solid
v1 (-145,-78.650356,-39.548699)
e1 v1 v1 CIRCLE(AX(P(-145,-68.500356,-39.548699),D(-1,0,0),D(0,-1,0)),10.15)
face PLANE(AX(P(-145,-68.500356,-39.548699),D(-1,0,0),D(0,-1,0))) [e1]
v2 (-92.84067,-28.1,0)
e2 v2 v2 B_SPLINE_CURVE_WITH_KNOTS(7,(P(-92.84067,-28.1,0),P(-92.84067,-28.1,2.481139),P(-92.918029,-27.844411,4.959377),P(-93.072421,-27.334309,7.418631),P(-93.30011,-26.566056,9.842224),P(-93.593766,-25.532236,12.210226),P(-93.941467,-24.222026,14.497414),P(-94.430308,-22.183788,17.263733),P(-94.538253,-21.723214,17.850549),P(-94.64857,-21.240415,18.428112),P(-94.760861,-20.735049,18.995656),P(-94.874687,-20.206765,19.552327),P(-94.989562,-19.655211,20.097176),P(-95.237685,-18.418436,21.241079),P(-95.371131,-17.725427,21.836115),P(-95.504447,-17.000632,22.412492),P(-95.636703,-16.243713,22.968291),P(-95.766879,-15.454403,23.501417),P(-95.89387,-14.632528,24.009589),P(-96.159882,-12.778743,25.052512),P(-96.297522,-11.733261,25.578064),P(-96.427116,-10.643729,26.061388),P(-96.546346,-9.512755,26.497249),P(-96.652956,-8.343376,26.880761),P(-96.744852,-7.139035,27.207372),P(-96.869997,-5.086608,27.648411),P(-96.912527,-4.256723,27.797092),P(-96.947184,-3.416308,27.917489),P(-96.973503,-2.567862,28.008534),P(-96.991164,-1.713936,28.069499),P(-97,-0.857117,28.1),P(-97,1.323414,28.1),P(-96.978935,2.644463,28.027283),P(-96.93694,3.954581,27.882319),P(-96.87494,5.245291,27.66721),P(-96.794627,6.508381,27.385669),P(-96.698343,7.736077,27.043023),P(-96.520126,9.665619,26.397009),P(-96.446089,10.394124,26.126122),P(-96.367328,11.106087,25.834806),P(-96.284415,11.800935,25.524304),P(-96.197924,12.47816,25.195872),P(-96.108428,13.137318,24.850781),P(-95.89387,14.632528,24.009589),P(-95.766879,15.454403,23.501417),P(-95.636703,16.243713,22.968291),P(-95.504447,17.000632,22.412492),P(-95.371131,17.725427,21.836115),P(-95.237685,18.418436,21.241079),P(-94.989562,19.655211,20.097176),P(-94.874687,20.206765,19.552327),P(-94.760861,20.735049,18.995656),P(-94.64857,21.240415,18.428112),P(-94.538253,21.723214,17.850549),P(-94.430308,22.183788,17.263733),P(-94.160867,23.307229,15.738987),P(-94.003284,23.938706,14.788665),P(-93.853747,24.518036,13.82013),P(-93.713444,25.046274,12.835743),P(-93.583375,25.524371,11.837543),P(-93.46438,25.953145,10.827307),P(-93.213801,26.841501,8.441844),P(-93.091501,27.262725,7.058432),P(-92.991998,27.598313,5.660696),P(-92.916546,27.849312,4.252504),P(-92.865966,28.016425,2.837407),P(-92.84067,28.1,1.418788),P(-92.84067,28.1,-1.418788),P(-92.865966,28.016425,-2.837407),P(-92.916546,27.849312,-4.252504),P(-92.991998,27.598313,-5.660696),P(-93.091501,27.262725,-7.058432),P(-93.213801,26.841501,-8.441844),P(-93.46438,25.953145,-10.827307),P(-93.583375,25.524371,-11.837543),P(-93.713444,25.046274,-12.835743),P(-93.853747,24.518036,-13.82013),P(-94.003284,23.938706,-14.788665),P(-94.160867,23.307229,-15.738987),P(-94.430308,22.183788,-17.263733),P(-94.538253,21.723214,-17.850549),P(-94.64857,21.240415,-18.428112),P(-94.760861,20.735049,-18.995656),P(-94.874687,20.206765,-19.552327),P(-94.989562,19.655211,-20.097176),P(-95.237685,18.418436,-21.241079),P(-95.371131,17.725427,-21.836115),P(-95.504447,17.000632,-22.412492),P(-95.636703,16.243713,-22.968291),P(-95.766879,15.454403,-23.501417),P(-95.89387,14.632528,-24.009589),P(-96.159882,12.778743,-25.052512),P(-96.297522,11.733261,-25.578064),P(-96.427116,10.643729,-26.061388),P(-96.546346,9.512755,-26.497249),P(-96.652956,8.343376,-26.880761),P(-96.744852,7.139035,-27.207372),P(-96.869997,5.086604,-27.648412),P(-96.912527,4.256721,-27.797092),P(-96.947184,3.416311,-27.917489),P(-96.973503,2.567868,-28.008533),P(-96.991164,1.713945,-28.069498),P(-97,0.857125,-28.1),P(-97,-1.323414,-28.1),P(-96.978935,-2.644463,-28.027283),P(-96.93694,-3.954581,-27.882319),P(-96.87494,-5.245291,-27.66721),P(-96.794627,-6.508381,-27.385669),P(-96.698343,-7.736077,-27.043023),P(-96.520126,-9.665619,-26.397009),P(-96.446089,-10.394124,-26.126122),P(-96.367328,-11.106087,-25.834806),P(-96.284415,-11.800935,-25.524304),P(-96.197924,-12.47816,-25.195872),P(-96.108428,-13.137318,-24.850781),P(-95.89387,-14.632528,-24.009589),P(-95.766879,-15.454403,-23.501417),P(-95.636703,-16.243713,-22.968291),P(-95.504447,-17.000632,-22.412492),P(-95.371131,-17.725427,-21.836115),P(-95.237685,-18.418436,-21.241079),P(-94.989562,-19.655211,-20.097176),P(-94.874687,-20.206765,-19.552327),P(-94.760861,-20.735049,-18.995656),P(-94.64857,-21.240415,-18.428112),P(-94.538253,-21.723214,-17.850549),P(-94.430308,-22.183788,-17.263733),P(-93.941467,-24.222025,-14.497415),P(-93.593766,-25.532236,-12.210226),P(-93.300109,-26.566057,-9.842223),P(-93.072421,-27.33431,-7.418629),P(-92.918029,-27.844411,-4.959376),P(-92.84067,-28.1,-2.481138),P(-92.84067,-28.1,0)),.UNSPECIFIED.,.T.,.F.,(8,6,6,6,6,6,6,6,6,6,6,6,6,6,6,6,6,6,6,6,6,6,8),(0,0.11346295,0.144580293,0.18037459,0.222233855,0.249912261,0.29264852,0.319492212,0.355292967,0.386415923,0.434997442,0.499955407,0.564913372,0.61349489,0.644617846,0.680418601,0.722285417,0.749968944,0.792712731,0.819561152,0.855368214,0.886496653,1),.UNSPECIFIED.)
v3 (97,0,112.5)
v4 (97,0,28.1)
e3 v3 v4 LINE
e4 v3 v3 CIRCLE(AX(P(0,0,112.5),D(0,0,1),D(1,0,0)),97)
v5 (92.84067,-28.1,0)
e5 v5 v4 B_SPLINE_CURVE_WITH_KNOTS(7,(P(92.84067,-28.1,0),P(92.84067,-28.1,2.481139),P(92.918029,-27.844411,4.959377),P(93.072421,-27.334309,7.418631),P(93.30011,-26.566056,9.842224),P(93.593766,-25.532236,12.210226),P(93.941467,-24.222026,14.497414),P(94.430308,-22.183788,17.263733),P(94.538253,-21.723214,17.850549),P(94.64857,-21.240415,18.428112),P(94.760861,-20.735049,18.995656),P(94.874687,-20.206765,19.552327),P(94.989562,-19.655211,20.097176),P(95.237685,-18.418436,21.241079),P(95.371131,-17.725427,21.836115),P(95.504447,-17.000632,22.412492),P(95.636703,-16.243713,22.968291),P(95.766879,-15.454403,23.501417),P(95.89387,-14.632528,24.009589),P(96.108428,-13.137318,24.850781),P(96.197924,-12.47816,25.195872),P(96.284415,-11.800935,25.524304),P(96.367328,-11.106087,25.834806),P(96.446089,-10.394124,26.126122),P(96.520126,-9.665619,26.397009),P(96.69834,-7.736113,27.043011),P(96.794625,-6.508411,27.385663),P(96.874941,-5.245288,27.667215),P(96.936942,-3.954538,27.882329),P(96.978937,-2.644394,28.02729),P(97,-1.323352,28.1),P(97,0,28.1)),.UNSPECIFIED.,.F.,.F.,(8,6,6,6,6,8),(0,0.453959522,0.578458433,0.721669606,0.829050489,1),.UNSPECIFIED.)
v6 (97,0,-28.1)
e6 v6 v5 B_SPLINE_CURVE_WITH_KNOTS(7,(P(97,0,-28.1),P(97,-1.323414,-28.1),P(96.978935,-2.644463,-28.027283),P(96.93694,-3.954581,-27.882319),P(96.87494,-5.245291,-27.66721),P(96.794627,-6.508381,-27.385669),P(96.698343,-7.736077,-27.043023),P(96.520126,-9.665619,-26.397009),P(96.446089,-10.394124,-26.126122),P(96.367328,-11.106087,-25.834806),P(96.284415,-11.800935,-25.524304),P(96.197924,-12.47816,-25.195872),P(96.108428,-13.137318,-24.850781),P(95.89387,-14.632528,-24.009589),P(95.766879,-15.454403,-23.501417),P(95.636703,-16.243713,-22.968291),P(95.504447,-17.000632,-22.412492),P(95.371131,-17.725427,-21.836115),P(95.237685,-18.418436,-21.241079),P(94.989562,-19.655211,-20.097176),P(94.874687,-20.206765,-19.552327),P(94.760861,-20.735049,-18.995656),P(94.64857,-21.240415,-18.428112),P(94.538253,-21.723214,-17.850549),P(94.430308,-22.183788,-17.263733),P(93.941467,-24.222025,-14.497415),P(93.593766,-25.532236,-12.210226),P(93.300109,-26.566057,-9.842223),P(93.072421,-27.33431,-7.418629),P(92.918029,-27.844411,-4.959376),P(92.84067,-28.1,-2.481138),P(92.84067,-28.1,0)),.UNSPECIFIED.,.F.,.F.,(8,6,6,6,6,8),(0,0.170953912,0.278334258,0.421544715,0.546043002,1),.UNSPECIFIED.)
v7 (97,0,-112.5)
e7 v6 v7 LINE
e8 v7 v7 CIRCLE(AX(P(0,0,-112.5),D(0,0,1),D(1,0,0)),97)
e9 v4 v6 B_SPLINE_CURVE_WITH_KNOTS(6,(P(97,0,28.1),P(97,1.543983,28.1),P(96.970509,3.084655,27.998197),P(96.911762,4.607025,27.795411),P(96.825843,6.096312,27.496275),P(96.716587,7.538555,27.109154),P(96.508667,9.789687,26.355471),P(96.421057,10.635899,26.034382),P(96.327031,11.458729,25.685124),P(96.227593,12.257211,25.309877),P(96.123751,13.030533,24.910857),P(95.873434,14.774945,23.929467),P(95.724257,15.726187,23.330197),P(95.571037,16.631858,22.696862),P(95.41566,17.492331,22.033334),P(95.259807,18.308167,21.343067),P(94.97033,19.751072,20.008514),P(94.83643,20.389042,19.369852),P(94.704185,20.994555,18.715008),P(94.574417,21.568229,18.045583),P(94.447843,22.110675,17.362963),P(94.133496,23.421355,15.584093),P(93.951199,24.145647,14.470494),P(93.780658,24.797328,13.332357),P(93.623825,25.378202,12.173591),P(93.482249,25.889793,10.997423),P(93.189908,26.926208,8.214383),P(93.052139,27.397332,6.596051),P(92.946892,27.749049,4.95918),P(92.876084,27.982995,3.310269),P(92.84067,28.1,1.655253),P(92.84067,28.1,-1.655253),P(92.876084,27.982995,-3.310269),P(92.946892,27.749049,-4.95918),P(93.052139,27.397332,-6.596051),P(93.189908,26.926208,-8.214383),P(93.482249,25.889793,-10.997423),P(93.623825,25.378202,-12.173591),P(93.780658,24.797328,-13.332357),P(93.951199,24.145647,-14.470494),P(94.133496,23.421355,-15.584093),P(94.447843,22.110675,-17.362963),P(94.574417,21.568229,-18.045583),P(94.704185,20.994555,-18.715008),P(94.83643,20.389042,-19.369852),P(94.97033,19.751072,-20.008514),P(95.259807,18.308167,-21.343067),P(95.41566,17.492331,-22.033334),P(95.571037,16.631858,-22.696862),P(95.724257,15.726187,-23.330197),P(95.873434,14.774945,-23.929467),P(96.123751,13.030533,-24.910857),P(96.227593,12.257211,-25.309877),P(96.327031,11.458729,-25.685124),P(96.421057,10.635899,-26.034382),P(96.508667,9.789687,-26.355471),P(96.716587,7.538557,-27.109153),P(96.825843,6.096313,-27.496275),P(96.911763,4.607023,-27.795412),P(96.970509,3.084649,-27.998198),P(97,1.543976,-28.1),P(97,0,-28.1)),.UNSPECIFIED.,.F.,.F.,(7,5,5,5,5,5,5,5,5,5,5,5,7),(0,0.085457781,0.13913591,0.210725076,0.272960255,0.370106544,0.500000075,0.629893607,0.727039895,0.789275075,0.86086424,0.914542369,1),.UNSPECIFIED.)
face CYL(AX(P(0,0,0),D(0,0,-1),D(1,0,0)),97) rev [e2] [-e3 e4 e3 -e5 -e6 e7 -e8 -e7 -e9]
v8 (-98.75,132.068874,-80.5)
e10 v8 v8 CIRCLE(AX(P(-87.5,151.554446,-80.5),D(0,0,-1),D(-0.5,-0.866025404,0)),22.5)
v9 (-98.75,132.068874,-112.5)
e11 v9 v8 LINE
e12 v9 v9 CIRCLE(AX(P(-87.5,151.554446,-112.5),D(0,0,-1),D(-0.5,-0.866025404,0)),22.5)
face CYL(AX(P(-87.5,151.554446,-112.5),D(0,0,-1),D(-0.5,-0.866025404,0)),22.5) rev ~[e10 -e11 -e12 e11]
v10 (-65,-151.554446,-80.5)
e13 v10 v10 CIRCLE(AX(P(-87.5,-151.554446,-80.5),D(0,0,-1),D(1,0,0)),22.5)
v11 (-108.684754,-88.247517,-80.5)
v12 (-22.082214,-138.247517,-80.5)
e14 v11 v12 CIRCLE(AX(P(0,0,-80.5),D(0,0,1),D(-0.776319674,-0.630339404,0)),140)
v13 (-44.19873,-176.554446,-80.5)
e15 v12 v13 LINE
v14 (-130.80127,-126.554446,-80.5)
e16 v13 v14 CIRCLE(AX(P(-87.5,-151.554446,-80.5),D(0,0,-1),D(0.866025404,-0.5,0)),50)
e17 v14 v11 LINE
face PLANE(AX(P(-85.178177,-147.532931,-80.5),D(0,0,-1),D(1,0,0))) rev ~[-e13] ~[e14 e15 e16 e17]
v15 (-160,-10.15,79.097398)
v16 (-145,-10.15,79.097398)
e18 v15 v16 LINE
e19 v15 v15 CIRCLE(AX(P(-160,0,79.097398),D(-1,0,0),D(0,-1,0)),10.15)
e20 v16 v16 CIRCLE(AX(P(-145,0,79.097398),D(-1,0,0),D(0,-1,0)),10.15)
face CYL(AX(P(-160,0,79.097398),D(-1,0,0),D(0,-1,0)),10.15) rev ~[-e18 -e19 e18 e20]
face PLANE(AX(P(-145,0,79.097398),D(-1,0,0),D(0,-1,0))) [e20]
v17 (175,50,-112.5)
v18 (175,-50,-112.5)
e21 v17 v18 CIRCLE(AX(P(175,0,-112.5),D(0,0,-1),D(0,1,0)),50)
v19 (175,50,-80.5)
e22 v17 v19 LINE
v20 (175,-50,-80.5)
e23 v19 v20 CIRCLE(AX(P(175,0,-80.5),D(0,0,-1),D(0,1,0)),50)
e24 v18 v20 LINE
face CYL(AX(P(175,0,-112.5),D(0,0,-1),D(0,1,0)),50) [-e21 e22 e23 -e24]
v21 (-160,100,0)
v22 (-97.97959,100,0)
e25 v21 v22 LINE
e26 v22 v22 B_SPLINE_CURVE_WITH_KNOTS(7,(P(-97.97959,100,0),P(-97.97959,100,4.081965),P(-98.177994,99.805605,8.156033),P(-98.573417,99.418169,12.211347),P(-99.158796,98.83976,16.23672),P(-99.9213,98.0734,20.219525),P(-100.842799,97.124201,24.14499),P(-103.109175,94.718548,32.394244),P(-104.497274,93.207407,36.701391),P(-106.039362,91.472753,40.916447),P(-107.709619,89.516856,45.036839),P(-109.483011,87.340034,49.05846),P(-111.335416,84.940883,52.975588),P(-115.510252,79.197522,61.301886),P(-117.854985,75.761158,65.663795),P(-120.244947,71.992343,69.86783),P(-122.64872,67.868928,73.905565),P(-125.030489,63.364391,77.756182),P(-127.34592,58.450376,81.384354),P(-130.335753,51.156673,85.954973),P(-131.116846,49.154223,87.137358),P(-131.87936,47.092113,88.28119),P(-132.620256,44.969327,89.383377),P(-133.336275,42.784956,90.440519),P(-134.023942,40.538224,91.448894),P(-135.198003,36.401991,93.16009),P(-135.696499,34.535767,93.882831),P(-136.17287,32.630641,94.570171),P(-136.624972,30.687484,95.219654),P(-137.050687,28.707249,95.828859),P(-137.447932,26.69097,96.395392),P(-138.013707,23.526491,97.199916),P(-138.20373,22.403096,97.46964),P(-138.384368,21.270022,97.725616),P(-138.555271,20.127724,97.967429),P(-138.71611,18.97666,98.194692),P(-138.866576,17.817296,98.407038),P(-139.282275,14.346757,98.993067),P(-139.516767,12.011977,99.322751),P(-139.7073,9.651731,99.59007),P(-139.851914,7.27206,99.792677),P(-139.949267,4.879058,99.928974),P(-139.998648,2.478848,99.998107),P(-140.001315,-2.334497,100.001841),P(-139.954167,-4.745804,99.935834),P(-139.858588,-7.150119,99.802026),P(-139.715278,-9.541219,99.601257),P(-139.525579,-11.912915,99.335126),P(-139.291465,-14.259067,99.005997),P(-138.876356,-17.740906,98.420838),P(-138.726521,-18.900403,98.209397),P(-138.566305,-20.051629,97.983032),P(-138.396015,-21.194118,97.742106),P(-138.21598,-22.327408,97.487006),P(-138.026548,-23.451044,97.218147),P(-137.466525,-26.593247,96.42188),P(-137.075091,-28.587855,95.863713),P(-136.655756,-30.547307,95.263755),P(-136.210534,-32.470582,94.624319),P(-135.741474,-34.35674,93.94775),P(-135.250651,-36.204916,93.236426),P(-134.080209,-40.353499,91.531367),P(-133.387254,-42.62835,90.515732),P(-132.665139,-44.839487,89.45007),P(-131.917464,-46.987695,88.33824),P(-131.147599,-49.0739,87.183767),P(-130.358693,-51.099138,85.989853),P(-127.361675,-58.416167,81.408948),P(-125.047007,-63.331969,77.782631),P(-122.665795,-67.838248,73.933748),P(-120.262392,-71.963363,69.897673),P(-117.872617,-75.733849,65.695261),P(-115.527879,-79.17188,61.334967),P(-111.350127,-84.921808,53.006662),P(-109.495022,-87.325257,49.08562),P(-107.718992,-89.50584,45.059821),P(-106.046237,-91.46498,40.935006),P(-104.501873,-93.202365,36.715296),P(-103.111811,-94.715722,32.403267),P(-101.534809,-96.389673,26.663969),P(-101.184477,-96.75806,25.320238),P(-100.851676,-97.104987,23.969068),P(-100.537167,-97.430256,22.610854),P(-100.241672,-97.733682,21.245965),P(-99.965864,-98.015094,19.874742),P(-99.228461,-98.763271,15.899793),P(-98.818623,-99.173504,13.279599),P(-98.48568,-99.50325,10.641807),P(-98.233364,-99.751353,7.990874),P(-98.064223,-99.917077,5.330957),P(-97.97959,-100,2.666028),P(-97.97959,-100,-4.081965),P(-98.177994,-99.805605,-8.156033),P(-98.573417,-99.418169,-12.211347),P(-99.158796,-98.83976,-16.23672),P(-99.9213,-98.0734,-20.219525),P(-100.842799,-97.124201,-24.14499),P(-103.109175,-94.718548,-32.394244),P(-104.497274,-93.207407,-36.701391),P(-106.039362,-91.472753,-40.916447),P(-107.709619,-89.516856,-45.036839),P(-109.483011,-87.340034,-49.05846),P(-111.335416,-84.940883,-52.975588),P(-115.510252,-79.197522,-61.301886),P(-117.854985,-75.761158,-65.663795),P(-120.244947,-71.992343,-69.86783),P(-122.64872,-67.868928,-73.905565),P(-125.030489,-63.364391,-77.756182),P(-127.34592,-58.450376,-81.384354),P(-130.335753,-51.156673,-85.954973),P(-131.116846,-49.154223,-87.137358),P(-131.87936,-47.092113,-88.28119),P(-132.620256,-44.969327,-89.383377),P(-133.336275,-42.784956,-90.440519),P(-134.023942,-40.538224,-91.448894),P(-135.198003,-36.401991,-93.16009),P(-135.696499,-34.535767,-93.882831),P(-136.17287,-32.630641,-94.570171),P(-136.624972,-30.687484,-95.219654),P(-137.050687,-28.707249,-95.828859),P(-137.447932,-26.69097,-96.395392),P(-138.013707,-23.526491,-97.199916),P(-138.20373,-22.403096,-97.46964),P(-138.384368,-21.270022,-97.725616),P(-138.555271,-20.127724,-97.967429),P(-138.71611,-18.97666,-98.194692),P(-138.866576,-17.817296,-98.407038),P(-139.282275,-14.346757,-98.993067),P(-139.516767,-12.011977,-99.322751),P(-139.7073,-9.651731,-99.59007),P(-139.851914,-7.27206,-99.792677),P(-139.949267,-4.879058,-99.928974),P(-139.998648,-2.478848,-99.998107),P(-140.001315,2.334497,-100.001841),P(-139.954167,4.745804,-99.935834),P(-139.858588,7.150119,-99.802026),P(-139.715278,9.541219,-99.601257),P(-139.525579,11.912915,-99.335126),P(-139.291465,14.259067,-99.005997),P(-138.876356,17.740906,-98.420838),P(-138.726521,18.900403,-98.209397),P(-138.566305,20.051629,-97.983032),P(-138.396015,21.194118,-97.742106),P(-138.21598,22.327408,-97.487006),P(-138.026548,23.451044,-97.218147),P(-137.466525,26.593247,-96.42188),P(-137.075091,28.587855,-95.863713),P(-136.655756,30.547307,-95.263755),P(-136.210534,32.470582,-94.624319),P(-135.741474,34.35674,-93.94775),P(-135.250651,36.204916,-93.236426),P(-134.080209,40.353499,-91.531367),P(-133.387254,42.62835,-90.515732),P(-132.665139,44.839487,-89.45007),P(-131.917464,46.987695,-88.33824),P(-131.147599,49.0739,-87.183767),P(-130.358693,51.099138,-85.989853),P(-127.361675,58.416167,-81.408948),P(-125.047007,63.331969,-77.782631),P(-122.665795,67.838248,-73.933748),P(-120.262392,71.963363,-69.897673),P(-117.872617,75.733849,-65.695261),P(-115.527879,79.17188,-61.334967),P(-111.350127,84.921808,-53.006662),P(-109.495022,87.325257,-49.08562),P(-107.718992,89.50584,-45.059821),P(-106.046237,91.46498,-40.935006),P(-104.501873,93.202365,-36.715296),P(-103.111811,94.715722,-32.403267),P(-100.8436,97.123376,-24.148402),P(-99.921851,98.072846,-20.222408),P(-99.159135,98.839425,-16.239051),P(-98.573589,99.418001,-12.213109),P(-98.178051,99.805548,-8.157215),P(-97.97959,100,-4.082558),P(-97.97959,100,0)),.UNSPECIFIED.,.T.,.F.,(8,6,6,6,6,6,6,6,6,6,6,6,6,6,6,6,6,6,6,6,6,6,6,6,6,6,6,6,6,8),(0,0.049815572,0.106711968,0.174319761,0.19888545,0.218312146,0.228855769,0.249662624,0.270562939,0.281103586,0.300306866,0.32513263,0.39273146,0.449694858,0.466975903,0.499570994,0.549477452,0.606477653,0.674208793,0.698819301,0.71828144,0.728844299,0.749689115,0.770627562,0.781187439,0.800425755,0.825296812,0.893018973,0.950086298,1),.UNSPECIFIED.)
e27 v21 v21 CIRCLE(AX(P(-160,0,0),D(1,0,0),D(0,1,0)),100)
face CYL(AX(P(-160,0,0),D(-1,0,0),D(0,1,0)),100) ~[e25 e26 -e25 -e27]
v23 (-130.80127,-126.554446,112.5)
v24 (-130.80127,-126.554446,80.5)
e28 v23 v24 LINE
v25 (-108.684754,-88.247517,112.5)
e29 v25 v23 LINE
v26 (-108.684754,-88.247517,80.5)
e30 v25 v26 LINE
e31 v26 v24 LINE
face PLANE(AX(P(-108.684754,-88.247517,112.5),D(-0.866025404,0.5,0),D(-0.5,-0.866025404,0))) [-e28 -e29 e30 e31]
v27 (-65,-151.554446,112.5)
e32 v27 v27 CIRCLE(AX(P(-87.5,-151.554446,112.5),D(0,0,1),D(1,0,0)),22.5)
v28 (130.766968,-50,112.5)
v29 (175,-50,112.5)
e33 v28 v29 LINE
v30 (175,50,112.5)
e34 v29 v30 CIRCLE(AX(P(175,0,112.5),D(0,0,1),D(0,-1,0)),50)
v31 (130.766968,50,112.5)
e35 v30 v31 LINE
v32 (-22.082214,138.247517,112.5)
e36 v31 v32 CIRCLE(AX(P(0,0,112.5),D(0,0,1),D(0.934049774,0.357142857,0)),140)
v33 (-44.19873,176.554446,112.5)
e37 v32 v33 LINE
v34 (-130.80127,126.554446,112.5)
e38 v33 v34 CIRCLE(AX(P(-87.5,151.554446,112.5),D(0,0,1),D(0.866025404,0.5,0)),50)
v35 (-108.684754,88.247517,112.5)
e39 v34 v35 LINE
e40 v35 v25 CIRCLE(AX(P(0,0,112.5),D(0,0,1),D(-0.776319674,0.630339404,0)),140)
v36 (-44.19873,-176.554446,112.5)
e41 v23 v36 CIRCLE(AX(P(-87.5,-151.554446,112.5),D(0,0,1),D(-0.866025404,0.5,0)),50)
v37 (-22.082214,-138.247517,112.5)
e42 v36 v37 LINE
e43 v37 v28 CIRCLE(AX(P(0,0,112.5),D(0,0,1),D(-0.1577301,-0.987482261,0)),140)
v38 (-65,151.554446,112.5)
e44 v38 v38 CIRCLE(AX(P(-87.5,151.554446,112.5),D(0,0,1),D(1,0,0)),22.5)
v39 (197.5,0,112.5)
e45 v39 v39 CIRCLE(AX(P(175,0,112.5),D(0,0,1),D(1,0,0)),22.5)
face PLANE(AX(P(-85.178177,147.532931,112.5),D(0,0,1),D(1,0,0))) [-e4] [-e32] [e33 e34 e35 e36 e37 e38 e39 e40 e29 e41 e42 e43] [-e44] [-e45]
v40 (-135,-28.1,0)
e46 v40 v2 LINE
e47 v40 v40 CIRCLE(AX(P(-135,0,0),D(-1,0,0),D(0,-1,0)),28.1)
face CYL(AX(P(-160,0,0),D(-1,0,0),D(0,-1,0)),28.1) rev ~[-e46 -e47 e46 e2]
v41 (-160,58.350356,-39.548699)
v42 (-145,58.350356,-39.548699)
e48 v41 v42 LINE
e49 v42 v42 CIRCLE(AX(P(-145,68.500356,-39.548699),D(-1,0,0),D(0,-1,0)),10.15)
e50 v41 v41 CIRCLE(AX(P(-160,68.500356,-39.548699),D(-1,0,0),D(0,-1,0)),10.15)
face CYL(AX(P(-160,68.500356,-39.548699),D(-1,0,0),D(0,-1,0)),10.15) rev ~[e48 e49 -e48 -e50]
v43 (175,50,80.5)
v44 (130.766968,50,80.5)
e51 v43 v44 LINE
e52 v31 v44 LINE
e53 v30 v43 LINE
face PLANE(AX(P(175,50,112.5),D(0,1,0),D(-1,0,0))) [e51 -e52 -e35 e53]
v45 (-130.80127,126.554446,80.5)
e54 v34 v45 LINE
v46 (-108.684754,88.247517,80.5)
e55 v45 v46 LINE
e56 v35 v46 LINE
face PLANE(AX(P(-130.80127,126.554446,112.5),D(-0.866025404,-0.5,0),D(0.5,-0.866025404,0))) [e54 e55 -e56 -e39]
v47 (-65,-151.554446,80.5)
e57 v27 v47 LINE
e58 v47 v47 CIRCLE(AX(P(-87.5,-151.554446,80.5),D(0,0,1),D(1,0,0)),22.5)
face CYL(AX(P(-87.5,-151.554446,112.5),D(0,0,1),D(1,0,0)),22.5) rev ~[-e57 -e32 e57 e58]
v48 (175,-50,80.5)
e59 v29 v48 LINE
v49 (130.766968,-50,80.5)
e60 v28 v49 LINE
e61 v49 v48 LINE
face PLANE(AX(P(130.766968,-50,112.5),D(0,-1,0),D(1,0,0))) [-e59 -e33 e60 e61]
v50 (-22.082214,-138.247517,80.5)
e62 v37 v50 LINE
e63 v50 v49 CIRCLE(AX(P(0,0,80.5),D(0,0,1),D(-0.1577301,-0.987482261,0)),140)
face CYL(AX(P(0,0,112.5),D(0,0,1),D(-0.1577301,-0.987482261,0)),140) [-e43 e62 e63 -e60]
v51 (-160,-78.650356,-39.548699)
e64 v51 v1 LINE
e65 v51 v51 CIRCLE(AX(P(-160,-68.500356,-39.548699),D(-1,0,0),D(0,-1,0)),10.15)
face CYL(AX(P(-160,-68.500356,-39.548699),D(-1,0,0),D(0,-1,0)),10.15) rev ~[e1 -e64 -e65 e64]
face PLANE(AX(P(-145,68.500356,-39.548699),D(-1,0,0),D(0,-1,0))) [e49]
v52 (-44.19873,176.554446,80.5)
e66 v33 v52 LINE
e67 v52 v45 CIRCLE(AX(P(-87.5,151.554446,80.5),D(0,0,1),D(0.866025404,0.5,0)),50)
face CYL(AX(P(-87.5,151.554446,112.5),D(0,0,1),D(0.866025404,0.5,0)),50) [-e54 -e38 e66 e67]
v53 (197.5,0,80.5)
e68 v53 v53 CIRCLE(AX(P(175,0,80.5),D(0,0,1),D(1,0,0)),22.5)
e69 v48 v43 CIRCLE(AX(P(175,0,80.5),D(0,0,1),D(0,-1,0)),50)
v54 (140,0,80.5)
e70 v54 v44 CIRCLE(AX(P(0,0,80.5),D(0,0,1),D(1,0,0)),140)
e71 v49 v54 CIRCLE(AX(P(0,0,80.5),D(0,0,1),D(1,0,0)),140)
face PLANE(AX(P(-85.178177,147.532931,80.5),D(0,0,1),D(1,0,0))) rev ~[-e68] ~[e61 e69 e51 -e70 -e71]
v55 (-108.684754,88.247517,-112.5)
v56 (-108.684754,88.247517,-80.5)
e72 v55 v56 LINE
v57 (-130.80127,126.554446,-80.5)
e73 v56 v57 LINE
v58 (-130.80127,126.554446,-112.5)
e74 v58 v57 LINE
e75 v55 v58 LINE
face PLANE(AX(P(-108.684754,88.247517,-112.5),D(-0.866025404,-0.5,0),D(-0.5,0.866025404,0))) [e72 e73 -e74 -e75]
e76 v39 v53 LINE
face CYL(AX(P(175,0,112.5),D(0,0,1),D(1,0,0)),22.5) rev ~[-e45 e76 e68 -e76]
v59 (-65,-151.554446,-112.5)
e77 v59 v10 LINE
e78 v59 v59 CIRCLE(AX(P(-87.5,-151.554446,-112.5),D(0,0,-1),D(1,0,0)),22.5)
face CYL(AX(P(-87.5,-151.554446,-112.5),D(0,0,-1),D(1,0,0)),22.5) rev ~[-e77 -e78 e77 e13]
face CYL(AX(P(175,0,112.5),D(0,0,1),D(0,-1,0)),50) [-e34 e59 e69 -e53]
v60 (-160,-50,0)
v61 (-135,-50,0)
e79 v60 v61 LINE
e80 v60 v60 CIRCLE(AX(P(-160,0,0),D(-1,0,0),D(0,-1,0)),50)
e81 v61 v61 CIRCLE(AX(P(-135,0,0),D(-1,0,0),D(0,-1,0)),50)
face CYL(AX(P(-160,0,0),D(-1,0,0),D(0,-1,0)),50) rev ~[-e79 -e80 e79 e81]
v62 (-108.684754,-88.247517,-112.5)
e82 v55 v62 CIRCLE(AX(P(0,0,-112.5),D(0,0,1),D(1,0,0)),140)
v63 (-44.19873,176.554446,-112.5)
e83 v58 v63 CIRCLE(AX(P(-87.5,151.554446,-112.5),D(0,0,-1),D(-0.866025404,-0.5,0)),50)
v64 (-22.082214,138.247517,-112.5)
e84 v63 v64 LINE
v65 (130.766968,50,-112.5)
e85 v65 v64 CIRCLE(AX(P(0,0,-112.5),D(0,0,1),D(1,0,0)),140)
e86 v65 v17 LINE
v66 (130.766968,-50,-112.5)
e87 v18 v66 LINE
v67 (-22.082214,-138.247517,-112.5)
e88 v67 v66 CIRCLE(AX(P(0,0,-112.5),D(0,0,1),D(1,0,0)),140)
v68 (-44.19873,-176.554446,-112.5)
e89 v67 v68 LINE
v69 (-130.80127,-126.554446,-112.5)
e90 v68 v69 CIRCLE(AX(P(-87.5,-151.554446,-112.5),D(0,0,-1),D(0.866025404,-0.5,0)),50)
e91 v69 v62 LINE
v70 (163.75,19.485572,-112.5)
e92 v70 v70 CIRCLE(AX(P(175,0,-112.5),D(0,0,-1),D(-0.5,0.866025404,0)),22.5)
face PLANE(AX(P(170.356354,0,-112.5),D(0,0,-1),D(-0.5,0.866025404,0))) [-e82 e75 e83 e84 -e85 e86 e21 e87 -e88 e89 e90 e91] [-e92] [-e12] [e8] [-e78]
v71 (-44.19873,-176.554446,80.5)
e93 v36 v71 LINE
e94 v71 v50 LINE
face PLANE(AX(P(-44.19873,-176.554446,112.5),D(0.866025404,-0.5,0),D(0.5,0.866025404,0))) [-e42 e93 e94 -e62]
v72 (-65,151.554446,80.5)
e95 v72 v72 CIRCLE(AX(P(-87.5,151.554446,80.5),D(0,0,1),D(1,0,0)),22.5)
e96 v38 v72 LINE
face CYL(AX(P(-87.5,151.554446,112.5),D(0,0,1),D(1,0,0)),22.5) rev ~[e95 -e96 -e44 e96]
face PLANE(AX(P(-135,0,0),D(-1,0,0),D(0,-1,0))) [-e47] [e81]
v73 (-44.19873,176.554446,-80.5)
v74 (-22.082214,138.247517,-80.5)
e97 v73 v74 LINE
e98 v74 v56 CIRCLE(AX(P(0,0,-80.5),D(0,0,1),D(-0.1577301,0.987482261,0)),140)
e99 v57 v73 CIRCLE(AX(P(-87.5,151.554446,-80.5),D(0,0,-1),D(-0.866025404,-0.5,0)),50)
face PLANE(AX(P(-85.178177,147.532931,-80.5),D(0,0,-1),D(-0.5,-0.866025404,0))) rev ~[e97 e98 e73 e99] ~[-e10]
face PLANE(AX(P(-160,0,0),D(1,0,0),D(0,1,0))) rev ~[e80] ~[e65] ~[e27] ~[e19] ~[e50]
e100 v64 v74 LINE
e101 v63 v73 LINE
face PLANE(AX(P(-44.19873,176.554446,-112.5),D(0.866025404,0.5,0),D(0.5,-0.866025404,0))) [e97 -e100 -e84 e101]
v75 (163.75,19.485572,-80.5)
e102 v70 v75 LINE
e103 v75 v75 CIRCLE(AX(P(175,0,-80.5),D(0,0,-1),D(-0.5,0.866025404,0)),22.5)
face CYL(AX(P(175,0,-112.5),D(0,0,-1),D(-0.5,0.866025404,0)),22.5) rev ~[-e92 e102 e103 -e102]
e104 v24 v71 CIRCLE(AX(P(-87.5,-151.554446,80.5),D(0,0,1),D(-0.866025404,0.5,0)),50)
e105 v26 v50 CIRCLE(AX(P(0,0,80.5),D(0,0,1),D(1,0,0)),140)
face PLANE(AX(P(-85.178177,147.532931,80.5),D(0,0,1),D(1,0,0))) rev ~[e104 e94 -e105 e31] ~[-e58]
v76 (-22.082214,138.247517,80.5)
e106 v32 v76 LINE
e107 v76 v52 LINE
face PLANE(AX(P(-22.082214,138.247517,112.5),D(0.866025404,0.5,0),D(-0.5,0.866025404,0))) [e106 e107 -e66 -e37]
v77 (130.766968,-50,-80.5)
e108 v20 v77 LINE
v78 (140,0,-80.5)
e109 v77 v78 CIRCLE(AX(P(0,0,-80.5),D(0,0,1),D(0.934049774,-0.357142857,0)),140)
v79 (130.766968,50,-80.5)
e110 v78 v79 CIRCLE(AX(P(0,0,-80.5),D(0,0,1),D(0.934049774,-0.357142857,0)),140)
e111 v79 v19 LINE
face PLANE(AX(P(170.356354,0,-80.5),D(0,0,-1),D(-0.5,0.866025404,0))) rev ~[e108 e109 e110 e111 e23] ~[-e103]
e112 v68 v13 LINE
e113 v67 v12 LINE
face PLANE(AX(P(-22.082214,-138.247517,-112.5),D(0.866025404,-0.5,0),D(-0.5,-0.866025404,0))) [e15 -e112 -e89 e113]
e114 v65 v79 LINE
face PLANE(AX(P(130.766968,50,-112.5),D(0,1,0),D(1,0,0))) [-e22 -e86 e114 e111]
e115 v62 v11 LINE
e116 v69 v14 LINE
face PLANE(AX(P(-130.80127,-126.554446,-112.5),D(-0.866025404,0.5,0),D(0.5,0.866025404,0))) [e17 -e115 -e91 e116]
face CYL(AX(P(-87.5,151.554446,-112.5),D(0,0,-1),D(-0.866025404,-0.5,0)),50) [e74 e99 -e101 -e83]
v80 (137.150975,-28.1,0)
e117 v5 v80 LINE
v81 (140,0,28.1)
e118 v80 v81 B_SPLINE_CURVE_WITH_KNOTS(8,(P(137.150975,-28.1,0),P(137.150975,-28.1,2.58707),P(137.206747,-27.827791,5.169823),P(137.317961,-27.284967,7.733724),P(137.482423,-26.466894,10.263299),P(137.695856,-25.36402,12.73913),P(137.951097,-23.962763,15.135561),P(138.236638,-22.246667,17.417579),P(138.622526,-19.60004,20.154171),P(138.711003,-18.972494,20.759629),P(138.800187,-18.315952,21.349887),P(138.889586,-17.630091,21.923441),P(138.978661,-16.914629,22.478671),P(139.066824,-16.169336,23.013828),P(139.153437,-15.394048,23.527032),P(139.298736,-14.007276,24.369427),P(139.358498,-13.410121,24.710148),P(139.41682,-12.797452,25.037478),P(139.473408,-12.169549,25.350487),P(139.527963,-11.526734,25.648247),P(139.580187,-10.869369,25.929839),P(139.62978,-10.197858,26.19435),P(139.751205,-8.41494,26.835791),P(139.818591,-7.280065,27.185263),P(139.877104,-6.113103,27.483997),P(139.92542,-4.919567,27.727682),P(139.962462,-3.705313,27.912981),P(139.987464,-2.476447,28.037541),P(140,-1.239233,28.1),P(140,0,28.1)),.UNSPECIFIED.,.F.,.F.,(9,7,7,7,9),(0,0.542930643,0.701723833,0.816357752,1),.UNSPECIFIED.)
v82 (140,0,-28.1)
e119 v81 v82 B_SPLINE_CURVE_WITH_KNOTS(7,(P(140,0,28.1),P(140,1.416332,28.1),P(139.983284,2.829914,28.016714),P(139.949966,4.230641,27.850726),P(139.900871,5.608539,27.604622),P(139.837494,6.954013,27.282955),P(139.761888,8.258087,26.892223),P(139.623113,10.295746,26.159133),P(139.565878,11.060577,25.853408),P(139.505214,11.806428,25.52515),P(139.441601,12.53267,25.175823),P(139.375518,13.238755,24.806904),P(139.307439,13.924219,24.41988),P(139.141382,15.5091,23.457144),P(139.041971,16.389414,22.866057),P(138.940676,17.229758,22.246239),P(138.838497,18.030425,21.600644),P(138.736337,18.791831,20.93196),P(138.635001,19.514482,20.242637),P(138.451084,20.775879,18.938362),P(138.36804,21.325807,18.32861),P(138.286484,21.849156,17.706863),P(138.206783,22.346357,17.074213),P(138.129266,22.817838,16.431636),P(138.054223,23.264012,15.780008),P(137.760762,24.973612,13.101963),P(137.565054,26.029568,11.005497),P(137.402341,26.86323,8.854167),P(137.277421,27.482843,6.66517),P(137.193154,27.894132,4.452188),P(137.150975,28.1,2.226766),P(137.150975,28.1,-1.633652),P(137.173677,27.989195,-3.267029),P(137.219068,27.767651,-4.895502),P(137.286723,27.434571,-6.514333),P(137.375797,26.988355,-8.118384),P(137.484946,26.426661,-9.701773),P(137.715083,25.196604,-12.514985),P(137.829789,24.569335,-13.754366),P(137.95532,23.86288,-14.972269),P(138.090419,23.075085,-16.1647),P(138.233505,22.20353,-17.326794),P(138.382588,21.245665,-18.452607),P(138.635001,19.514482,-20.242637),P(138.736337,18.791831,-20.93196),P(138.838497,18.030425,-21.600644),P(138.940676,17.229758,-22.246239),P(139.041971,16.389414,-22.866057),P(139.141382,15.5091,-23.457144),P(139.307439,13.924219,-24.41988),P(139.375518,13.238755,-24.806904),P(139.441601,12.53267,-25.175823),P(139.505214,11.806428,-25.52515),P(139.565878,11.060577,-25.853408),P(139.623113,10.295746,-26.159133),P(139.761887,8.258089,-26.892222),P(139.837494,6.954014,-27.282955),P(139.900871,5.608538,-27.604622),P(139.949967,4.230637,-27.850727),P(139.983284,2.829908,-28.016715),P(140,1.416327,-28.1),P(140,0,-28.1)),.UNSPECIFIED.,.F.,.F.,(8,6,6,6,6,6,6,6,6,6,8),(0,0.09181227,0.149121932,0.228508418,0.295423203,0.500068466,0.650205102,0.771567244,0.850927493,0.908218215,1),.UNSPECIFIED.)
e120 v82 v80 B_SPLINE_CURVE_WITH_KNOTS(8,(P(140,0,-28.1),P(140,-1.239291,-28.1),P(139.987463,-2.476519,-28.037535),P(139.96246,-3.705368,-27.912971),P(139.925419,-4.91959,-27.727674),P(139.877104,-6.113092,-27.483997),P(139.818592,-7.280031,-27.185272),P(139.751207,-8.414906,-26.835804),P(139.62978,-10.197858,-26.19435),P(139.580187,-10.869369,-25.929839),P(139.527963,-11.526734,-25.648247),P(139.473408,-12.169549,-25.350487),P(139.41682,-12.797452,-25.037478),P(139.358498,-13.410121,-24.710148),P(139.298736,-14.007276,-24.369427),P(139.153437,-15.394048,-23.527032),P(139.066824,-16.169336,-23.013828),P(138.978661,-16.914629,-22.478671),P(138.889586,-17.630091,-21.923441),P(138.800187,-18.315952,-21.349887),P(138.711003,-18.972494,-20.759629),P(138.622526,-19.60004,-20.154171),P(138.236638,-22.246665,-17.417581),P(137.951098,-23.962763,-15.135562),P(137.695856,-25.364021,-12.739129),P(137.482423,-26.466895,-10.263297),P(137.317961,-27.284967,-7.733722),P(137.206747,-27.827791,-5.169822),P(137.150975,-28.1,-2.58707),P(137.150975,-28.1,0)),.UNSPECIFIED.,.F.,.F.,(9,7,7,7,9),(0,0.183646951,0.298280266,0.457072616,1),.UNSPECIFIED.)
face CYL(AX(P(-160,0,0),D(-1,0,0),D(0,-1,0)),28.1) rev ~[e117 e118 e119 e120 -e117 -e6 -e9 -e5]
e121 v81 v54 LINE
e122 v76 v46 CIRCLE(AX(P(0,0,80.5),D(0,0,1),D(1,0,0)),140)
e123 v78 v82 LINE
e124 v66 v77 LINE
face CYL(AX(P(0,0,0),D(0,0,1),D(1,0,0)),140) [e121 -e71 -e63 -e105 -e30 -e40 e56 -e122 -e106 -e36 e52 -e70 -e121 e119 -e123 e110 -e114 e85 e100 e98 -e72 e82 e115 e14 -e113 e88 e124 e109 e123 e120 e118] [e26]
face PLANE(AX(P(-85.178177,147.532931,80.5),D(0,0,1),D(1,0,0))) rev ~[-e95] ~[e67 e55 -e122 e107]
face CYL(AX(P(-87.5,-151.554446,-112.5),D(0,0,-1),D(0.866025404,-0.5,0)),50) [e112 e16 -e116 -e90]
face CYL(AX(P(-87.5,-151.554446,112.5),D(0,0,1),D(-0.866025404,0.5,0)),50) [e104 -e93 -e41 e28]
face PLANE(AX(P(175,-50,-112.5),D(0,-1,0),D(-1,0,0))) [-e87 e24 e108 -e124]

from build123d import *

# Parameters (mm, degrees)
F0_R            = 140
F0_R_2          = 97
F1_DEPTH        = 112.5
F2_R            = 22.5
F3_DEPTH        = 32
F3_COPIES_COUNT = 3
F5_R            = 100
F7_R            = 28.1
F8_DEPTH        = 310
F9_R            = 50
F9_R_2          = 28.1
F10_DEPTH       = 25
F11_R           = 10.15
F12_DEPTH       = 15
F14_R           = 22.5
F14_R_2         = 97
F15_DEPTH       = 32


# Not quite as in the source:
# - a pattern or mirror of a feature is missing from the dataset's text; its kind, count and spacing are read off the source's solid
# - a feature names something its author has since deleted; it is built from what else it names


with BuildPart() as f1:
    # F0 (on Top) → F1 (new body, symmetric)
    with BuildSketch(Plane.XY):
        Circle(F0_R)
        Circle(F0_R_2, mode=Mode.SUBTRACT)
    extrude(amount=F1_DEPTH, both=True)

    # F2 (on face) → F3 (join)
    with BuildSketch(Plane(origin=(0, 0, -112.5), x_dir=(1, 0, 0), z_dir=(0, 0, -1))):
        with BuildLine():
            ThreePointArc((-44.1987298108, 176.5544456623), (-112.5, 194.8557158515), (-130.8012701892, 126.5544456623))
            Line((-130.8012701892, 126.5544456623), (-108.6847543423, 88.2475165291))
            ThreePointArc((-108.6847543423, 88.2475165291), (-70, 121.2435565298), (-22.0822139639, 138.2475165291))
            Line((-22.0822139639, 138.2475165291), (-44.1987298108, 176.5544456623))
        make_face()
        with Locations((-87.5, 151.5544456623)):
            Circle(F2_R, mode=Mode.SUBTRACT)
    f3 = extrude(amount=-F3_DEPTH)

    # F3_copies: F3 ×3 about axis
    f3_copies_axis = Axis((0, 0, 0), (0, 0, 1))
    for i in range(1, F3_COPIES_COUNT):
        add(f3.rotate(f3_copies_axis, i * 360 / F3_COPIES_COUNT))

    # F5 (on offset) → F6 (join, up to the next surface of F1)
    with BuildSketch(Plane.YZ.offset(-160)):
        Circle(F5_R)
    extrude(until=Until.NEXT)

    # F7 (on face) → F8 (cut)
    with BuildSketch(Plane(origin=(-160, 0, 0), x_dir=(0, -1, 0), z_dir=(-1, 0, 0))):
        Circle(F7_R)
    extrude(amount=-F8_DEPTH, mode=Mode.SUBTRACT)

    # F9 (on face) → F10 (cut)
    with BuildSketch(Plane(origin=(-160, 0, 0), x_dir=(0, -1, 0), z_dir=(-1, 0, 0))):
        Circle(F9_R)
        Circle(F9_R_2, mode=Mode.SUBTRACT)
    extrude(amount=-F10_DEPTH, mode=Mode.SUBTRACT)

    # F11 (on face) → F12 (cut)
    with BuildSketch(Plane(origin=(-160, 0, 0), x_dir=(0, -1, 0), z_dir=(-1, 0, 0))):
        with Locations((0, 79.0973976254)):
            Circle(F11_R)
        with Locations((-68.5003557169, -39.5486988127)):
            Circle(F11_R)
        with Locations((68.5003557169, -39.5486988127)):
            Circle(F11_R)
    extrude(amount=-F12_DEPTH, mode=Mode.SUBTRACT)

    # F14 (on face) → F15 (join)
    with BuildSketch(Plane.XY.offset(112.5)):
        with BuildLine():
            Line((-130.8012701892, 126.5544456623), (-108.6847543423, 88.2475165291))
            ThreePointArc((-108.6847543423, 88.2475165291), (-70, 121.2435565298), (-22.0822139639, 138.2475165291))
            Line((-22.0822139639, 138.2475165291), (-44.1987298108, 176.5544456623))
            ThreePointArc((-44.1987298108, 176.5544456623), (-112.5, 194.8557158515), (-130.8012701892, 126.5544456623))
        make_face()
        with Locations((-87.5, 151.5544456623)):
            Circle(F14_R, mode=Mode.SUBTRACT)
        with BuildLine():
            ThreePointArc((-22.0822139639, 138.2475165291), (-70, 121.2435565298), (-108.6847543423, 88.2475165291))
            ThreePointArc((-108.6847543423, 88.2475165291), (-140, 0), (-108.6847543423, -88.2475165291))
            ThreePointArc((-108.6847543423, -88.2475165291), (-70, -121.2435565298), (-22.0822139639, -138.2475165291))
            ThreePointArc((-22.0822139639, -138.2475165291), (70, -121.2435565298), (130.7669683062, -50))
            ThreePointArc((130.7669683062, -50), (137.6723929531, -25.4226713499), (140, 0))
            ThreePointArc((140, 0), (137.6723929531, 25.4226713499), (130.7669683062, 50))
            ThreePointArc((130.7669683062, 50), (70, 121.2435565298), (-22.0822139639, 138.2475165291))
        make_face()
        Circle(F14_R_2, mode=Mode.SUBTRACT)
        with BuildLine():
            ThreePointArc((-22.0822139639, -138.2475165291), (-70, -121.2435565298), (-108.6847543423, -88.2475165291))
            Line((-108.6847543423, -88.2475165291), (-130.8012701892, -126.5544456623))
            ThreePointArc((-130.8012701892, -126.5544456623), (-112.5, -194.8557158515), (-44.1987298108, -176.5544456623))
            Line((-44.1987298108, -176.5544456623), (-22.0822139639, -138.2475165291))
        make_face()
        with Locations((-87.5, -151.5544456623)):
            Circle(F14_R, mode=Mode.SUBTRACT)
        with BuildLine():
            Line((175, 50), (130.7669683062, 50))
            ThreePointArc((130.7669683062, 50), (137.6723929531, 25.4226713499), (140, 0))
            ThreePointArc((140, 0), (137.6723929531, -25.4226713499), (130.7669683062, -50))
            Line((130.7669683062, -50), (175, -50))
            ThreePointArc((175, -50), (225, 0), (175, 50))
        make_face()
        with Locations((175, 0)):
            Circle(F14_R, mode=Mode.SUBTRACT)
    extrude(amount=-F15_DEPTH)


solid = f1.part
